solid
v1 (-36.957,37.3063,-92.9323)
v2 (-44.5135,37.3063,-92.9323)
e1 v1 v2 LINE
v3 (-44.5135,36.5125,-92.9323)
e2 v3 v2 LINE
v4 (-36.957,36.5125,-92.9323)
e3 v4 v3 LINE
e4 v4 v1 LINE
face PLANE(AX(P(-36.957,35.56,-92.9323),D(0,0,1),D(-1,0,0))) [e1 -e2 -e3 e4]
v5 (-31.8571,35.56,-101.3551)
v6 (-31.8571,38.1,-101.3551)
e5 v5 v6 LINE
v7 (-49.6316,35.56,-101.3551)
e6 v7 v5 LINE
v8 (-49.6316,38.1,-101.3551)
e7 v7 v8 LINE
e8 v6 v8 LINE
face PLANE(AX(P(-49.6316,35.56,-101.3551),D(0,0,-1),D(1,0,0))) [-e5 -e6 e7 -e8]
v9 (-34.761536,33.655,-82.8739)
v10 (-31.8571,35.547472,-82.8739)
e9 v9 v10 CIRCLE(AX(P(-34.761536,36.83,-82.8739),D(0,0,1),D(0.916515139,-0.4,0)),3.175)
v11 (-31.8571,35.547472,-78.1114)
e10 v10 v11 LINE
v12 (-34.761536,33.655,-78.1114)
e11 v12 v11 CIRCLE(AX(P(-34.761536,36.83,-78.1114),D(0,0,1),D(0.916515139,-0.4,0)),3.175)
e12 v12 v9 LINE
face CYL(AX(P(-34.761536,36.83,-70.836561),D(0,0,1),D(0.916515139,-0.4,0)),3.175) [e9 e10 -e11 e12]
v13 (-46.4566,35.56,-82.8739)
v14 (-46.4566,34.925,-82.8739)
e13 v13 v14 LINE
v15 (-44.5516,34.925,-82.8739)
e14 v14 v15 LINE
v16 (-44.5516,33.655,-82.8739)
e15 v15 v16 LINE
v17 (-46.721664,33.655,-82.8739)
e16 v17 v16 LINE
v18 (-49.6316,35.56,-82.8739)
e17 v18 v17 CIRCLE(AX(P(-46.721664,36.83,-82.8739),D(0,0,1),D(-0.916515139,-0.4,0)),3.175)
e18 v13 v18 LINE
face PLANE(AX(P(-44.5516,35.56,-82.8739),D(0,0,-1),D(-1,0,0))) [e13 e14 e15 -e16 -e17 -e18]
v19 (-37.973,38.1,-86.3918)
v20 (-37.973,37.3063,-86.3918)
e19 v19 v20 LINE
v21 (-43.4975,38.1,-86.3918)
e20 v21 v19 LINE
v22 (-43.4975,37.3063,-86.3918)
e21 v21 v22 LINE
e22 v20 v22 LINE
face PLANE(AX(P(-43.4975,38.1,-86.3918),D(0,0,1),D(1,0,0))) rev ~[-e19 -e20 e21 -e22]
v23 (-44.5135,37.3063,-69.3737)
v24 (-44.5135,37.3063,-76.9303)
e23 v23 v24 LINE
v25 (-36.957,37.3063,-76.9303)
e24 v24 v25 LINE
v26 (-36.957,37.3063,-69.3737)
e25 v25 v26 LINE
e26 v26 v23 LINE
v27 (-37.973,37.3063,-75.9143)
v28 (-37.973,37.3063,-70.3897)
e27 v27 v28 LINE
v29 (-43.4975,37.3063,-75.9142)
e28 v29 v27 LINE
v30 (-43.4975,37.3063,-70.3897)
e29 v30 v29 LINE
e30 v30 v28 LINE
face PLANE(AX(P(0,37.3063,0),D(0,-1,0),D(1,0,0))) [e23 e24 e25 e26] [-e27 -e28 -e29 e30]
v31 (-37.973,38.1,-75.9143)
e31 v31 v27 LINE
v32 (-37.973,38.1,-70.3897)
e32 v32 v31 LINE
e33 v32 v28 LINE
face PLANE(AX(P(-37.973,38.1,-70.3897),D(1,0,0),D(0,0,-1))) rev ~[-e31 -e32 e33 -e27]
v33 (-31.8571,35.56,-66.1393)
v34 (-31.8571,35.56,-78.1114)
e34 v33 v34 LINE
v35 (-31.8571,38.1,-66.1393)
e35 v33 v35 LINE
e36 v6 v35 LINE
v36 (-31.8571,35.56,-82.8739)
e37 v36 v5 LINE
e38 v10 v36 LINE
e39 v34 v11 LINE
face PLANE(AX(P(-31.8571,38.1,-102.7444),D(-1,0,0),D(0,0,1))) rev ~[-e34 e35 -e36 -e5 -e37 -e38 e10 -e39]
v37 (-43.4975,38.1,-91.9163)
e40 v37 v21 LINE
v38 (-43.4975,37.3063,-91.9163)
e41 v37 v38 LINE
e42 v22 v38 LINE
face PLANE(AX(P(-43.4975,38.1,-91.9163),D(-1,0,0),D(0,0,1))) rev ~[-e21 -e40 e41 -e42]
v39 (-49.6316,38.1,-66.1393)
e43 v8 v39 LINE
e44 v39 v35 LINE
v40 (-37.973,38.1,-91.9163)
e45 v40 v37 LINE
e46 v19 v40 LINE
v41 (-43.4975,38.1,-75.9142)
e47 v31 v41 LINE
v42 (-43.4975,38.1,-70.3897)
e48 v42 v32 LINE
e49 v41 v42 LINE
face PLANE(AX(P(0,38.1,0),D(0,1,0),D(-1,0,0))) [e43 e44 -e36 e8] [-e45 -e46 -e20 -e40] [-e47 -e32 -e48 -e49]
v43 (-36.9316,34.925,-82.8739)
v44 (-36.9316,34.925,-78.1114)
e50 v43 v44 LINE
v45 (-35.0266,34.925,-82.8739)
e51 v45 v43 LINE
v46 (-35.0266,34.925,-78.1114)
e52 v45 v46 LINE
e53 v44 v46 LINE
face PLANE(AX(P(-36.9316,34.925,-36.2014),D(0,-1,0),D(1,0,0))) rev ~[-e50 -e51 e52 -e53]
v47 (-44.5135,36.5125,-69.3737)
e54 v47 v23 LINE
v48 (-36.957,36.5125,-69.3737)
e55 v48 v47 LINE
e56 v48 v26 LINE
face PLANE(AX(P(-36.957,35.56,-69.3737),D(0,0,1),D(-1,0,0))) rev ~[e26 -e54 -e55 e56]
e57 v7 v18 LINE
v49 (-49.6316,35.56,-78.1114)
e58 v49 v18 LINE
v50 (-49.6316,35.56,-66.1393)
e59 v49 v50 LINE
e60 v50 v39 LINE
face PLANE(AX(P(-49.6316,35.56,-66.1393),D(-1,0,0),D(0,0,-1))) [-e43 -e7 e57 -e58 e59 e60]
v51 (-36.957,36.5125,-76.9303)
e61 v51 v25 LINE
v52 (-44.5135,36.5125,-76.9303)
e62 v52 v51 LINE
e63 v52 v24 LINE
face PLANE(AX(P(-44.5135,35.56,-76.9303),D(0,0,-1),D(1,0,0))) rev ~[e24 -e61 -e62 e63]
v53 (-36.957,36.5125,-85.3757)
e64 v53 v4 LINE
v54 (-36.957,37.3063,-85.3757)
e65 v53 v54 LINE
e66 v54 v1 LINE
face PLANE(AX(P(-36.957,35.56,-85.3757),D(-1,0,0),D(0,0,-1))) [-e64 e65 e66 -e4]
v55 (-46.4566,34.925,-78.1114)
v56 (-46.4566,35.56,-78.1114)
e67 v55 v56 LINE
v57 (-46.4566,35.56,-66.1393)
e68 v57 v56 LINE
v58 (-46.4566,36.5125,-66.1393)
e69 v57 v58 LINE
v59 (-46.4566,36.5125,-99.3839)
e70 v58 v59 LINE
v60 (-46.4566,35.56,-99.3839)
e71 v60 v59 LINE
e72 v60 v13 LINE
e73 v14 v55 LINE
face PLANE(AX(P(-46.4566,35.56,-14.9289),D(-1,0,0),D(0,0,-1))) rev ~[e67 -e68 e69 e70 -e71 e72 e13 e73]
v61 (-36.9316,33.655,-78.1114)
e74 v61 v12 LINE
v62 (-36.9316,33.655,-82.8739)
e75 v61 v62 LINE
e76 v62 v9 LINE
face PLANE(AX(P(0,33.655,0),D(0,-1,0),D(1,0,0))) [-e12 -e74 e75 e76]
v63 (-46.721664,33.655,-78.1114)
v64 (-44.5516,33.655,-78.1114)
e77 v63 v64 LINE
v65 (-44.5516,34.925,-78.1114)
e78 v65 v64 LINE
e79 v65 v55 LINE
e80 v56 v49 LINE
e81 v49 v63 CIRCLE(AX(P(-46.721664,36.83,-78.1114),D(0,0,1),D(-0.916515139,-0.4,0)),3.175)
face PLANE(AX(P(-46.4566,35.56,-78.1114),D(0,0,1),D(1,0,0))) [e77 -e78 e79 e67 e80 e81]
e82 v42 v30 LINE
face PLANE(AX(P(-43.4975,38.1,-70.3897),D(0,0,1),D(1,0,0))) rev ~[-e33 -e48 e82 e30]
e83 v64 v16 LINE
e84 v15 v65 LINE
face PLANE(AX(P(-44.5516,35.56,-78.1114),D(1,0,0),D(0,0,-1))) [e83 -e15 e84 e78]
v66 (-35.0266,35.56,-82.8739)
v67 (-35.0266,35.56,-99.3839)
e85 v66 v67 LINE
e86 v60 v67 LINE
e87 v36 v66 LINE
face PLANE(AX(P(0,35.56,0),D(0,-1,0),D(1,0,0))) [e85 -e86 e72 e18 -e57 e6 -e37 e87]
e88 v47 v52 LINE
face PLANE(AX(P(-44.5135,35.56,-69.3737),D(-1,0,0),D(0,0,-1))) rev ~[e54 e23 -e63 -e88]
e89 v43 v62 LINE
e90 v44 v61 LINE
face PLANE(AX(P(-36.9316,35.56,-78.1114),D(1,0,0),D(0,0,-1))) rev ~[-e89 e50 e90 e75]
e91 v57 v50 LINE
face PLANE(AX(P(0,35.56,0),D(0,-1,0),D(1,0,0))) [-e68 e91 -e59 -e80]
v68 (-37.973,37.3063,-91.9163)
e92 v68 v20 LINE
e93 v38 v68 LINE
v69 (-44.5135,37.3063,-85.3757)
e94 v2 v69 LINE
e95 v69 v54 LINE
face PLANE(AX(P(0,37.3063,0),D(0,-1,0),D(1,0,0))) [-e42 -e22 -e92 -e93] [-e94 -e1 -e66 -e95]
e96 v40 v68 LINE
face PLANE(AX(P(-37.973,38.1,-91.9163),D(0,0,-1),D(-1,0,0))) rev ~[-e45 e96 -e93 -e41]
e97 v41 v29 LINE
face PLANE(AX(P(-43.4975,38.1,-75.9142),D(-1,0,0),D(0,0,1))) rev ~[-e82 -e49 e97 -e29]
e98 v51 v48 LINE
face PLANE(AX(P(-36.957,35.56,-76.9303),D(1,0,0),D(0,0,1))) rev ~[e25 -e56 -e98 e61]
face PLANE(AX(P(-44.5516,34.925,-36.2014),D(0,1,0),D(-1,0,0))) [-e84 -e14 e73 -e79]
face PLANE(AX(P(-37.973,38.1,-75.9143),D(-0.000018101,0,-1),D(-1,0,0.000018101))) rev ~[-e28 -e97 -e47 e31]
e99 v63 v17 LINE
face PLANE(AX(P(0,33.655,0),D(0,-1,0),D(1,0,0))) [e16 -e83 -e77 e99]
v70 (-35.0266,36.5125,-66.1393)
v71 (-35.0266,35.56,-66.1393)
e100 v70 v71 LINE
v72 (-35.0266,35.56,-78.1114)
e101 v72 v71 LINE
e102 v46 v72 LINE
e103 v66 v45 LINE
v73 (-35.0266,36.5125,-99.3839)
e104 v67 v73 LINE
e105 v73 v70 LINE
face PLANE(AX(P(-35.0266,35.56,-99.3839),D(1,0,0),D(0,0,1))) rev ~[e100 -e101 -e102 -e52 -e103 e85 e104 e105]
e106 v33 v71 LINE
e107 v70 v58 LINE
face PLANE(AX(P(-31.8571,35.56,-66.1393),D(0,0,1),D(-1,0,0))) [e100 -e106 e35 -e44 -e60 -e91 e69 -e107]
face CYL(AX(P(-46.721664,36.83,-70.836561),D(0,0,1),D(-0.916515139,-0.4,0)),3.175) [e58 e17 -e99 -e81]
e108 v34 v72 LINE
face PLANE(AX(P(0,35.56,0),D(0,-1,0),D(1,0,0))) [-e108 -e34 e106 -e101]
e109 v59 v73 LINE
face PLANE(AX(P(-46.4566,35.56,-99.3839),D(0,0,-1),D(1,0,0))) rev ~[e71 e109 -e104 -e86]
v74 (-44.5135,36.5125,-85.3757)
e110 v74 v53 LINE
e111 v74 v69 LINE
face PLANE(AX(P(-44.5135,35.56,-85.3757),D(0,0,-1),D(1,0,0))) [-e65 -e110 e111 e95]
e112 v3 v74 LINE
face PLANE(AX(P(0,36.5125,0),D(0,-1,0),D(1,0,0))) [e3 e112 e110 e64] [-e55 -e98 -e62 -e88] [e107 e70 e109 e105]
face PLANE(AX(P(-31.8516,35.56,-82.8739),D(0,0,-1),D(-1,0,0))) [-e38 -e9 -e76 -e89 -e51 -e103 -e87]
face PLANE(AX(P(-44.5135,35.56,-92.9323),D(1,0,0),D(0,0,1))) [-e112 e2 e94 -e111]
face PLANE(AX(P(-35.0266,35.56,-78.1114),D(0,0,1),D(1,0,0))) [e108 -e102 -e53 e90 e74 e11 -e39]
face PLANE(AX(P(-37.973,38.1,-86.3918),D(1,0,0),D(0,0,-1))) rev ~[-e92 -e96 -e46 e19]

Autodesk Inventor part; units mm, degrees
ref_plane "YZ Plane" through (0, 0, 0) normal (1, 0, 0) x (0, 1, 0)
ref_plane "XZ Plane" through (0, 0, 0) normal (0, 1, 0) x (-1, 0, 0)
ref_plane "XY Plane" through (0, 0, 0) normal (0, 0, 1) x (1, 0, 0)
sketch "Sketch1" plane through (0, 0, 0) normal (0, 1, 0) x (-1, 0, 0)
  line L0 (0, 0) -> (177.8, 0)
  line L1 (177.8, 0) -> (177.8, -114.3)
  line L2 (177.8, -114.3) -> (0, -114.3)
  line L3 (0, -114.3) -> (0, 0)
  dimension "d0" = 177.8
  dimension "d1" = 114.3
extrude "Extrusion1" add sketch "Sketch1" along normal blind 38.1
sketch "Sketch2" plane through (0, 0, 0) normal (0, -1, 0) x (1, 0, 0)
  line L0 (-177.8, -114.3) -> (-177.8, 0) projected
  line L1 (0, 0) -> (-177.8, 0)
  line L2 (-177.8, 0) -> (-177.8, -114.3)
  line L3 (-177.8, -114.3) -> (0, -114.3)
  line L4 (0, -114.3) -> (0, 0)
  line L5 (-5.08, -5.08) -> (-172.72, -5.08)
  line L6 (-172.72, -5.08) -> (-172.72, -109.22)
  line L7 (-172.72, -109.22) -> (-5.08, -109.22)
  line L8 (-5.08, -109.22) -> (-5.08, -5.08)
  dimension "d4" = 5.08
extrude "Extrusion2" cut sketch "Sketch2" against normal blind 35.56 contours L8 L7 L6 L5
fillet "Fillet1" radius 3.175 4 edges at (-177.8, 38.1, -57.15) (-88.9, 38.1, 0) (-88.9, 38.1, -114.3) (0, 38.1, -57.15)
sketch "Sketch3" plane through (0, 38.1, 0) normal (0, 1, 0) x (1, 0, 0)
  line L0 (-177.8, 114.3) -> (-171.45, 114.3)
  line L1 (-171.45, 114.3) -> (-171.45, 0)
  line L2 (-171.45, 0) -> (-177.8, 0)
  line L3 (-177.8, 0) -> (-177.8, 114.3)
  line L4 (0, 114.3) -> (-177.8, 114.3) projected
  line L5 (-177.8, 114.3) -> (0, 114.3)
  line L6 (0, 114.3) -> (0, 107.95)
  line L7 (0, 107.95) -> (-177.8, 107.95)
  line L8 (-177.8, 107.95) -> (-177.8, 114.3)
  line L9 (-158.75, 100.4887) -> (-100.6475, 100.4887)
  line L10 (-100.6475, 100.4887) -> (-100.6475, 13.8112)
  line L11 (-100.6475, 13.8112) -> (-158.75, 13.8112)
  line L12 (-158.75, 13.8112) -> (-158.75, 100.4887)
  point P0 (0, 0)
  dimension "d8" = 6.35
  dimension "d9" = 6.35
  dimension "d10" = 58.1025
  dimension "d11" = 86.6775
  dimension "d12" = 13.8112
  dimension "d13" = 19.05
extrude "Extrusion3" cut sketch "Sketch3" against normal blind 35.56 contours L9 L10 L11 L12
sketch "Sketch4" plane through (0, 38.1, 0) normal (0, 1, 0) x (1, 0, 0)
  line L0 (-94.2975, 17.78) -> (-81.2088, 17.78)
  line L1 (-91.7575, 20.32) -> (-91.7575, 26.67)
  line L2 (-91.7575, 26.67) -> (-94.2975, 26.67)
  line L3 (-94.2975, 26.67) -> (-94.2975, 17.78)
  line L4 (-94.2975, 17.78) -> (-78.6765, 17.78)
  line L5 (-78.6765, 17.78) -> (-78.6765, 20.32)
  line L6 (-94.2975, 24.2647) -> (-94.2975, 17.78)
  line L7 (-85.6615, 20.32) -> (-85.6615, 24.13)
  line L8 (-85.6615, 24.13) -> (-88.2015, 24.13)
  line L9 (-88.2015, 24.13) -> (-88.2015, 20.32)
  line L10 (-78.6765, 20.32) -> (-85.6615, 20.32)
  line L11 (-88.2015, 20.32) -> (-91.7575, 20.32)
  line L12 (-100.6475, 100.4887) -> (-100.6475, 13.8112) projected
  line L13 (-177.8, 0) -> (0, 0) projected
  line L14 (-94.2975, 27.94) -> (-78.6765, 27.94)
  line L15 (-78.6765, 27.94) -> (-78.6765, 30.7699)
  line L16 (-81.2165, 30.48) -> (-94.2975, 30.48)
  line L17 (-94.2975, 30.48) -> (-94.2975, 27.94)
  line L18 (-83.0828, 27.94) -> (-78.6765, 27.94)
  line L19 (-78.6765, 27.94) -> (-78.6765, 36.83)
  line L20 (-78.6765, 36.83) -> (-81.2165, 36.83)
  line L21 (-81.2165, 36.83) -> (-81.2165, 30.48)
  ellipse E0 centre (-86.487, 41.91) end of major axis (-94.2975, 41.91) minor radius 5.334
  ellipse E1 centre (-86.487, 53.34) end of major axis (-94.2975, 53.34) minor radius 5.334
  line L22 (-94.2975, 60.96) -> (-78.6765, 60.96)
  line L23 (-78.6765, 60.96) -> (-78.6765, 63.754)
  line L24 (-94.2975, 63.754) -> (-94.2975, 60.96)
  ellipse E2 centre (-86.487, 63.754) end of major axis (-94.2975, 63.754) minor radius 7.62 (-78.6765, 63.754) -> (-94.2975, 63.754) ccw
  line L25 (-91.7575, 63.754) -> (-91.7575, 63.5)
  line L26 (-91.7575, 63.5) -> (-81.2165, 63.5)
  line L27 (-81.2165, 63.5) -> (-81.2165, 63.754)
  line L28 (-94.2975, 82.55) -> (-78.6765, 82.55)
  line L29 (-78.6765, 82.55) -> (-78.6765, 80.01)
  line L30 (-78.6765, 80.01) -> (-94.2975, 80.01)
  line L31 (-94.2975, 80.01) -> (-94.2975, 82.55)
  line L32 (-91.7575, 89.535) -> (-78.6765, 89.535)
  line L33 (-78.6765, 89.535) -> (-78.6765, 92.075)
  line L34 (-78.6765, 92.075) -> (-91.7575, 92.075)
  line L35 (-94.2975, 94.8241) -> (-94.2975, 91.9305)
  line L36 (-94.2975, 85.09) -> (-91.7575, 85.09)
  line L37 (-91.7575, 96.52) -> (-94.2975, 96.52)
  line L38 (-94.2975, 96.52) -> (-94.2975, 85.09)
  line L39 (-91.7575, 85.09) -> (-91.7575, 89.535)
  line L40 (-91.7575, 92.075) -> (-91.7575, 96.52)
  spline S0 degree 5 poles (-91.7575, 41.91) (-91.7584, 41.6813) (-91.6944, 41.4527) (-91.5885, 41.2473) (-91.2042, 40.6846) (-90.6636, 40.2564) (-90.282, 40.0177) (-89.3306, 39.5478) (-88.3046, 39.2718) (-87.7026, 39.1679) (-86.487, 39.0641) (-85.2714, 39.1679) (-84.6694, 39.2718) (-83.6435, 39.5478) (-82.692, 40.0176) (-82.3107, 40.2563) (-81.7696, 40.6845) (-81.3858, 41.2473) (-81.2787, 41.4526) (-81.1539, 41.91) (-81.2787, 42.3674) (-81.3858, 42.5727) (-81.7696, 43.1355) (-82.3107, 43.5637) (-82.692, 43.8024) (-83.6435, 44.2722) (-84.6694, 44.5482) (-85.2714, 44.6521) (-86.487, 44.7559) (-87.7026, 44.6521) (-88.3046, 44.5482) (-89.3306, 44.2722) (-90.282, 43.8023) (-90.6636, 43.5636) (-91.2042, 43.1354) (-91.5885, 42.5727) (-91.6944, 42.3673) (-91.7584, 42.1387) (-91.7575, 41.91) knots 0 0 0 0 0 0 0.044471 0.044471 0.044471 0.131758 0.131758 0.131758 0.25 0.25 0.25 0.36824 0.36824 0.36824 0.455522 0.455522 0.455522 0.5 0.5 0.5 0.544478 0.544478 0.544478 0.63176 0.63176 0.63176 0.75 0.75 0.75 0.868242 0.868242 0.868242 0.955529 0.955529 0.955529 1 1 1 1 1 1
  spline S1 degree 5 poles (-91.7575, 53.34) (-91.7584, 53.1113) (-91.6944, 52.8827) (-91.5885, 52.6773) (-91.2042, 52.1146) (-90.6636, 51.6864) (-90.282, 51.4477) (-89.3306, 50.9778) (-88.3046, 50.7018) (-87.7026, 50.5979) (-86.487, 50.4941) (-85.2714, 50.5979) (-84.6694, 50.7018) (-83.6435, 50.9778) (-82.692, 51.4476) (-82.3107, 51.6863) (-81.7696, 52.1145) (-81.3858, 52.6773) (-81.2787, 52.8826) (-81.1539, 53.34) (-81.2787, 53.7974) (-81.3858, 54.0027) (-81.7696, 54.5655) (-82.3107, 54.9937) (-82.692, 55.2324) (-83.6435, 55.7022) (-84.6694, 55.9782) (-85.2714, 56.0821) (-86.487, 56.1859) (-87.7026, 56.0821) (-88.3046, 55.9782) (-89.3306, 55.7022) (-90.282, 55.2323) (-90.6636, 54.9936) (-91.2042, 54.5654) (-91.5885, 54.0027) (-91.6944, 53.7973) (-91.7584, 53.5687) (-91.7575, 53.34) knots 0 0 0 0 0 0 0.044471 0.044471 0.044471 0.131758 0.131758 0.131758 0.25 0.25 0.25 0.36824 0.36824 0.36824 0.455522 0.455522 0.455522 0.5 0.5 0.5 0.544478 0.544478 0.544478 0.63176 0.63176 0.63176 0.75 0.75 0.75 0.868242 0.868242 0.868242 0.955529 0.955529 0.955529 1 1 1 1 1 1
  spline S2 degree 5 poles (-81.2165, 63.754) (-81.2166, 64.309) (-81.2953, 64.8639) (-81.4525, 65.404) (-82.1282, 66.8995) (-83.3585, 68.0474) (-84.3453, 68.5716) (-86.487, 69.0964) (-88.6287, 68.5716) (-89.6155, 68.0474) (-90.8458, 66.8995) (-91.5215, 65.404) (-91.6787, 64.8639) (-91.7574, 64.309) (-91.7575, 63.754) knots 0 0 0 0 0 0 0.170659 0.170659 0.170659 0.5 0.5 0.5 0.829341 0.829341 0.829341 1 1 1 1 1 1
  point P0 (-94.2975, 93.3773)
  point P1 (-88.9, 0)
  point P2 (-93.0275, 85.09)
  dimension "d32" = 5.334
  dimension "d33" = 7.8105
  dimension "d36" = 7.8105
  dimension "d37" = 5.334
  dimension "d42" = 7.62
  dimension "d43" = 2.54
  dimension "d16" = 2.54
  dimension "d17" = 3.556
  dimension "d18" = 2.54
  dimension "d19" = 6.985
  dimension "d20" = 8.89
  dimension "d21" = 6.35
  dimension "d22" = 3.81
  dimension "d23" = 3.81
  dimension "d24" = 6.35
  dimension "d25" = 17.78
  dimension "d26" = 2.54
  dimension "d27" = 2.54
  dimension "d28" = 6.35
  dimension "d29" = 15.621
  dimension "d30" = 6.35
  dimension "d31" = 27.94
  dimension "d34" = 14.1605
  dimension "d35" = 41.91
  dimension "d38" = 14.1605
  dimension "d39" = 53.34
  dimension "d40" = 2.54
  dimension "d41" = 2.54
  dimension "d44" = 6.35
  dimension "d45" = 15.621
  dimension "d46" = 60.96
  dimension "d47" = 2.794
  dimension "d48" = 63.754
  dimension "d49" = 14.1605
  dimension "d50" = 2.54
  dimension "d51" = 15.621
  dimension "d52" = 4.445
  dimension "d53" = 4.445
  dimension "d54" = 2.54
  dimension "d55" = 2.54
  dimension "d56" = 6.35
  dimension "d57" = 80.01
  dimension "d58" = 2.54
  dimension "d59" = 13.081
  dimension "d62" = 3.9688
  dimension "d63" = 3.9688
extrude "Extrusion4" cut sketch "Sketch4" against normal blind 1.27
sketch "Sketch5" plane through (0, 38.1, 0) normal (0, 1, 0) x (1, 0, 0)
  line L0 (-43.4975, 22.3838) -> (-37.973, 22.3838)
  line L1 (-37.973, 22.3838) -> (-37.973, 27.9083)
  line L2 (-37.973, 27.9083) -> (-43.4975, 27.9083)
  line L3 (-43.4975, 27.9083) -> (-43.4975, 22.3838)
  line L4 (-43.4975, 38.3858) -> (-37.973, 38.3858)
  line L5 (-37.973, 38.3858) -> (-37.973, 43.9103)
  line L6 (-37.973, 43.9103) -> (-43.4975, 43.9103)
  line L7 (-43.4975, 43.9103) -> (-43.4975, 38.3858)
  line L8 (-43.4975, 54.3878) -> (-37.973, 54.3878)
  line L9 (-37.973, 54.3878) -> (-37.973, 59.9123)
  line L10 (-37.973, 59.9123) -> (-43.4975, 59.9123)
  line L11 (-43.4975, 59.9123) -> (-43.4975, 54.3878)
  line L12 (-43.4975, 70.3897) -> (-37.973, 70.3897)
  line L13 (-37.973, 70.3897) -> (-37.973, 75.9143)
  line L14 (-37.973, 75.9143) -> (-43.4975, 75.9142)
  line L15 (-43.4975, 75.9142) -> (-43.4975, 70.3897)
  line L16 (-43.4975, 86.3918) -> (-37.973, 86.3918)
  line L17 (-37.973, 86.3918) -> (-37.973, 91.9163)
  line L18 (-37.973, 91.9163) -> (-43.4975, 91.9163)
  line L19 (-43.4975, 91.9163) -> (-43.4975, 86.3918)
  line L20 (0, 114.3) -> (-177.8, 114.3) projected
  line L21 (-177.8, 0) -> (0, 0) projected
  line L22 (-100.6475, 100.4887) -> (-100.6475, 13.8112) projected
  circle A0 centre (-21.9075, 25.4) radius 3.81
  circle A1 centre (-21.9075, 41.275) radius 3.81
  circle A2 centre (-21.9075, 57.15) radius 3.81
  circle A3 centre (-21.9075, 73.025) radius 3.81
  circle A4 centre (-21.9075, 88.9) radius 3.81
  point P0 (-43.4975, 73.152)
  dimension "d64" = 5.5245
  dimension "d65" = 5.5245
  dimension "d66" = 5.5245
  dimension "d67" = 5.5245
  dimension "d68" = 5.5245
  dimension "d69" = 5.5245
  dimension "d70" = 16.002
  dimension "d71" = 16.002
  dimension "d72" = 16.002
  dimension "d73" = 16.002
  dimension "d74" = 22.3837
  dimension "d76" = 57.15
  dimension "d77" = 7.62
  dimension "d78" = 7.62
  dimension "d79" = 7.62
  dimension "d80" = 7.62
  dimension "d81" = 7.62
  dimension "d82" = 15.875
  dimension "d83" = 15.875
  dimension "d84" = 15.875
  dimension "d85" = 15.875
  dimension "d86" = 25.4
  dimension "d87" = 78.74
  dimension "d88" = 78.74
  dimension "d89" = 78.74
  dimension "d90" = 78.74
  dimension "d91" = 78.74
extrude "Extrusion5" cut sketch "Sketch5" against normal blind 25.4
sketch "Sketch6" plane through (0, 35.56, 0) normal (0, -1, 0) x (1, 0, 0)
  circle A0 centre (-21.9075, -88.9) radius 3.81 projected
  circle A1 centre (-21.9075, -88.9) radius 5.08
  circle A2 centre (-21.9075, -73.025) radius 3.81 projected
  circle A3 centre (-21.9075, -73.025) radius 5.08
  circle A4 centre (-21.9075, -57.15) radius 3.81 projected
  circle A5 centre (-21.9075, -57.15) radius 5.08
  circle A6 centre (-21.9075, -41.275) radius 3.81 projected
  circle A7 centre (-21.9075, -41.275) radius 5.08
  circle A8 centre (-21.9075, -25.4) radius 3.81 projected
  circle A9 centre (-21.9075, -25.4) radius 5.08
  line L0 (-43.4975, -86.3918) -> (-43.4975, -91.9163) projected
  line L1 (-43.4975, -91.9163) -> (-37.973, -91.9163)
  line L2 (-37.973, -91.9163) -> (-37.973, -86.3918)
  line L3 (-37.973, -86.3918) -> (-43.4975, -86.3918)
  line L4 (-43.4975, -86.3918) -> (-43.4975, -91.9163)
  line L5 (-43.4975, -75.9142) -> (-37.973, -75.9143) projected
  line L6 (-43.4975, -70.3897) -> (-37.973, -70.3897) projected
  line L7 (-43.4975, -75.9142) -> (-37.973, -75.9142)
  line L8 (-37.973, -75.9142) -> (-37.973, -70.3897)
  line L9 (-37.973, -70.3897) -> (-43.4975, -70.3897)
  line L10 (-43.4975, -70.3897) -> (-43.4975, -75.9142)
  line L11 (-43.4975, -54.3878) -> (-43.4975, -59.9123) projected
  line L12 (-43.4975, -54.3878) -> (-37.973, -54.3878) projected
  line L13 (-43.4975, -59.9123) -> (-37.973, -59.9123)
  line L14 (-37.973, -59.9123) -> (-37.973, -54.3878)
  line L15 (-37.973, -54.3878) -> (-43.4975, -54.3878)
  line L16 (-43.4975, -54.3878) -> (-43.4975, -59.9123)
  line L17 (-43.4975, -38.3858) -> (-43.4975, -43.9103) projected
  line L18 (-37.973, -38.3858) -> (-43.4975, -38.3858) projected
  line L19 (-43.4975, -43.9103) -> (-37.973, -43.9103)
  line L20 (-37.973, -43.9103) -> (-37.973, -38.3858)
  line L21 (-37.973, -38.3858) -> (-43.4975, -38.3858)
  line L22 (-43.4975, -38.3858) -> (-43.4975, -43.9103)
  line L23 (-43.4975, -22.3838) -> (-43.4975, -27.9083) projected
  line L24 (-43.4975, -27.9083) -> (-37.973, -27.9083)
  line L25 (-37.973, -27.9083) -> (-37.973, -22.3838)
  line L26 (-37.973, -22.3838) -> (-43.4975, -22.3838)
  line L27 (-43.4975, -22.3838) -> (-43.4975, -27.9083)
  line L28 (-44.5135, -85.3757) -> (-36.957, -85.3757)
  line L29 (-36.957, -85.3757) -> (-36.957, -92.9323)
  line L30 (-36.957, -92.9323) -> (-44.5135, -92.9323)
  line L31 (-44.5135, -92.9323) -> (-44.5135, -85.3757)
  line L32 (-44.5135, -76.9303) -> (-36.957, -76.9303)
  line L33 (-36.957, -76.9303) -> (-36.957, -69.3737)
  line L34 (-36.957, -69.3737) -> (-44.5135, -69.3737)
  line L35 (-44.5135, -69.3737) -> (-44.5135, -76.9303)
  line L36 (-36.957, -60.9282) -> (-44.5135, -60.9282)
  line L37 (-44.5135, -60.9282) -> (-44.5135, -53.3717)
  line L38 (-44.5135, -53.3717) -> (-36.957, -53.3717)
  line L39 (-36.957, -53.3717) -> (-36.957, -60.9282)
  line L40 (-36.957, -44.9262) -> (-44.5135, -44.9262)
  line L41 (-44.5135, -44.9262) -> (-44.5135, -37.3698)
  line L42 (-44.5135, -37.3698) -> (-36.957, -37.3698)
  line L43 (-36.957, -37.3698) -> (-36.957, -44.9262)
  line L44 (-36.957, -28.9242) -> (-44.5135, -28.9242)
  line L45 (-44.5135, -28.9242) -> (-44.5135, -21.3678)
  line L46 (-44.5135, -21.3678) -> (-36.957, -21.3678)
  line L47 (-36.957, -21.3678) -> (-36.957, -28.9242)
  line L48 (-46.4566, -99.3839) -> (-35.0266, -99.3839)
  line L49 (-35.0266, -99.3839) -> (-35.0266, -14.9289)
  line L50 (-35.0266, -14.9289) -> (-46.4566, -14.9289)
  line L51 (-46.4566, -14.9289) -> (-46.4566, -99.3839)
  point P0 (0, 0)
  point P1 (-40.7352, -92.9323)
  point P2 (-40.7416, -99.3839)
  point P3 (-40.7416, -14.9289)
  point P4 (-40.7352, -21.3678)
  dimension "d97" = 10.16
  dimension "d98" = 10.16
  dimension "d99" = 10.16
  dimension "d100" = 10.16
  dimension "d101" = 10.16
  dimension "d189" = 1.016
  dimension "d190" = 1.016
  dimension "d191" = 1.016
  dimension "d192" = 1.016
  dimension "d193" = 1.016
  dimension "d194" = 11.43
  dimension "d195" = 1.9431
  dimension "d196" = 1.9304
  dimension "d197" = 84.455
  dimension "d198" = 6.4516
  dimension "d199" = 6.4389
extrude "Extrusion6" cut sketch "Sketch6" against normal blind 1.27 contours A1 | A3 | A5 | A7 | A9
extrude "Extrusion9" cut sketch "Sketch6" against normal blind 1.7463 contours L28 L29 L30 L31 | L35 L34 L33 L32 | L36 L37 L38 L39 | L40 L41 L42 L43 | L44 L45 L46 L47
sketch "Sketch8" plane through (0, 35.56, 0) normal (0, -1, 0) x (1, 0, 0)
  line L0 (-100.6475, -13.8112) -> (-100.6475, -100.4887) projected
  line L1 (-100.6475, -13.8112) -> (-158.75, -13.8112)
  line L2 (-158.75, -13.8112) -> (-158.75, -7.4613)
  line L3 (-158.75, -7.4613) -> (-100.6475, -7.4612)
  line L4 (-100.6475, -7.4612) -> (-100.6475, -13.8112)
  line L5 (-158.75, -100.4887) -> (-100.6475, -100.4887) projected
  line L6 (-100.6475, -100.4887) -> (-158.75, -100.4887)
  line L7 (-158.75, -100.4887) -> (-158.75, -107.4737)
  line L8 (-158.75, -107.4737) -> (-100.6475, -107.4737)
  line L9 (-100.6475, -107.4737) -> (-100.6475, -100.4887)
  line L10 (-100.6475, -7.4612) -> (-94.2975, -7.4612)
  line L11 (-94.2975, -7.4612) -> (-94.2975, -13.8112)
  line L12 (-94.2975, -13.8112) -> (-100.6475, -13.8112)
  line L13 (-100.6475, -13.8112) -> (-100.6475, -7.4612)
  line L14 (-100.6475, -100.4887) -> (-94.2975, -100.4887)
  line L15 (-94.2975, -100.4887) -> (-94.2975, -107.4737)
  line L16 (-94.2975, -107.4737) -> (-100.6475, -107.4737)
  line L17 (-100.6475, -107.4737) -> (-100.6475, -100.4887)
  line L18 (-158.75, -100.4887) -> (-165.1, -100.4887)
  line L19 (-165.1, -100.4887) -> (-165.1, -107.4737)
  line L20 (-165.1, -107.4737) -> (-158.75, -107.4737)
  line L21 (-158.75, -107.4737) -> (-158.75, -100.4887)
  line L22 (-158.75, -7.4613) -> (-165.1, -7.4613)
  line L23 (-165.1, -7.4613) -> (-165.1, -13.8112)
  line L24 (-165.1, -13.8112) -> (-158.75, -13.8112)
  line L25 (-158.75, -13.8112) -> (-158.75, -7.4613)
  line L26 (-102.4053, -9.0487) -> (-155.7453, -9.0487)
  line L27 (-155.7453, -9.0487) -> (-155.7453, -12.2237)
  line L28 (-155.7453, -12.2237) -> (-102.4053, -12.2237)
  line L29 (-102.4053, -12.2237) -> (-102.4053, -9.0487)
  point P0 (0, 0)
  dimension "d126" = 6.35
  dimension "d127" = 6.985
  dimension "d128" = 6.35
  dimension "d129" = 6.35
  dimension "d130" = 6.35
  dimension "d131" = 53.34
  dimension "d132" = 3.175
  dimension "d133" = 1.5875
extrude "Extrusion10" cut sketch "Sketch8" against normal blind 1.27 contours L29 L28 L27 L26
extrude "Extrusion11" cut sketch "Sketch6" against normal blind 0.9525 contours L51 L50 L49 L48
sketch "Sketch9" plane through (-177.8, 0, 0) normal (0, 0, 1) x (1, 0, 0)
  line L0 (77.1525, 35.56) -> (19.05, 35.56) projected
  line L1 (172.72, 0) -> (5.08, 0) projected
  line L2 (77.1525, 35.56) -> (127.9525, 35.56)
  line L3 (127.9525, 35.56) -> (127.9525, 0)
  line L4 (127.9525, 0) -> (77.1525, 0)
  line L5 (77.1525, 0) -> (77.1525, 35.56)
  line L6 (86.868, 17.145) -> (106.68, 17.145)
  line L7 (106.68, 17.145) -> (106.68, 15.3035)
  line L8 (106.68, 15.3035) -> (86.868, 15.3035)
  line L9 (86.868, 15.3035) -> (86.868, 17.145)
  line L10 (89.408, 15.3035) -> (97.028, 15.3035)
  line L11 (97.028, 15.3035) -> (97.028, 11.7475)
  line L12 (97.028, 11.7475) -> (89.408, 11.7475)
  line L13 (89.408, 11.7475) -> (89.408, 15.3035)
  line L14 (0, 34.925) -> (177.8, 34.925) projected
  line L15 (0, 0) -> (0, 34.925) projected
  line L16 (177.8, 0) -> (177.8, 34.925) projected
  point P0 (97.028, 15.3035)
  dimension "d144" = 50.8
  dimension "d145" = 19.812
  dimension "d146" = 1.8415
  dimension "d147" = 7.62
  dimension "d148" = 3.556
  dimension "d149" = 2.54
  dimension "d150" = 17.78
  dimension "d187" = 71.12
extrude "Extrusion12" cut sketch "Sketch9" against normal blind 5.08 contours L6 L7 L8 L9 | L8 L11 L12 L13
sketch "Sketch10" plane through (-5.08, 0, -5.08) normal (0, 0, -1) x (-1, 0, 0)
  line L0 (83.312, 11.7475) -> (75.692, 11.7475) projected
  line L1 (83.312, 15.3035) -> (85.852, 15.3035) projected
  line L2 (75.692, 11.7475) -> (83.312, 11.7475)
  line L3 (83.312, 11.7475) -> (83.312, 15.3035)
  line L4 (75.692, 15.3035) -> (75.692, 11.7475)
  line L5 (75.692, 15.3035) -> (66.04, 15.3035) projected
  line L6 (85.852, 17.145) -> (85.852, 15.3035) projected
  line L7 (85.852, 15.3035) -> (85.852, 17.145)
  line L8 (85.852, 17.145) -> (66.04, 17.145)
  line L9 (66.04, 17.145) -> (66.04, 15.3035)
  line L10 (66.04, 15.3035) -> (75.692, 15.3035)
  line L11 (83.312, 15.3035) -> (85.852, 15.3035)
  line L12 (73.787, 9.8425) -> (85.217, 9.8425)
  line L13 (85.217, 9.8425) -> (85.217, 13.3985)
  line L14 (85.217, 13.3985) -> (87.757, 13.3985)
  line L15 (87.757, 13.3985) -> (87.757, 19.05)
  line L16 (87.757, 19.05) -> (64.135, 19.05)
  line L17 (64.135, 19.05) -> (64.135, 13.3985)
  line L18 (64.135, 13.3985) -> (73.787, 13.3985)
  line L19 (73.787, 13.3985) -> (73.787, 9.8425)
  line L20 (73.787, 13.3985) -> (73.787, 15.3035)
  line L21 (85.217, 13.3985) -> (85.217, 15.3035)
  point P0 (-5.08, 0)
  dimension "d153" = 1.905
extrude "Extrusion13" cut sketch "Sketch10" against normal blind 3.175 contours L3 L1 L21 L13 L12 L19 L20 L5 L4 L0 | L1 L6 L8 L9 L5 L20 L18 L17 L16 L15 L14 L21
sketch "Sketch11" plane through (0, 0, -114.3) normal (0, 0, -1) x (-1, 0, 0)
  line L0 (63.5, 23.495) -> (75.946, 23.495)
  line L1 (75.946, 23.495) -> (75.946, 16.383)
  line L2 (75.946, 16.383) -> (63.5, 16.383)
  line L3 (63.5, 16.383) -> (63.5, 23.495)
  line L4 (0, 0) -> (0, 34.925) projected
  circle A0 centre (69.723, 19.939) radius 3.556
  line L5 (0, 34.925) -> (177.8, 34.925) projected
  dimension "d156" = 7.112
  dimension "d157" = 63.5
  dimension "d158" = 12.446
  dimension "d164" = 11.43
  dimension "d219" = 7.112
  dimension "d220" = 3.556
  dimension "d221" = 6.223
extrude "Extrusion14" cut sketch "Sketch11" against normal blind 6.35 contours A0
sketch "Sketch12" plane through (-172.72, 0, -109.22) normal (0, 0, 1) x (1, 0, 0)
  line L0 (97.282, 16.383) -> (108.712, 16.383)
  line L1 (108.712, 16.383) -> (108.712, 23.495)
  line L2 (108.712, 23.495) -> (97.282, 23.495)
  line L3 (97.282, 23.495) -> (97.282, 16.383)
  circle A0 centre (102.997, 19.939) radius 3.556 projected
  line L4 (97.282, 16.383) -> (108.712, 23.495) construction
  line L5 (108.712, 16.383) -> (97.282, 23.495) construction
  point P0 (172.72, 0)
  point P1 (102.997, 16.383)
  point P2 (102.997, 23.495)
  dimension "d161" = 11.43
  dimension "d222" = 7.112
extrude "Extrusion15" cut sketch "Sketch12" against normal blind 2.0574 contours L3 L2 A0 L0 | A0 L2 L1 L0
sketch "Sketch13" plane through (0, 35.56, 0) normal (0, -1, 0) x (1, 0, 0)
  line L0 (-35.0266, -14.9289) -> (-35.0266, -99.3839) projected
  line L1 (-46.4566, -99.3839) -> (-46.4566, -14.9289) projected
  line L2 (-46.4566, -31.4389) -> (-44.5516, -31.4389)
  line L3 (-44.5516, -31.4389) -> (-44.5516, -36.2014)
  line L4 (-44.5516, -36.2014) -> (-46.4566, -36.2014)
  line L5 (-46.4566, -36.2014) -> (-46.4566, -31.4389)
  line L6 (-46.4566, -31.4389) -> (-49.6316, -31.4389)
  line L7 (-49.6316, -31.4389) -> (-49.6316, -36.2014)
  line L8 (-49.6316, -36.2014) -> (-46.4566, -36.2014)
  line L9 (-46.4566, -36.2014) -> (-46.4566, -31.4389)
  line L10 (-35.0266, -31.4389) -> (-36.9316, -31.4389)
  line L11 (-36.9316, -31.4389) -> (-36.9316, -36.2014)
  line L12 (-36.9316, -36.2014) -> (-35.0266, -36.2014)
  line L13 (-35.0266, -36.2014) -> (-35.0266, -31.4389)
  line L14 (-35.0266, -31.4389) -> (-31.8516, -31.4389)
  line L15 (-31.8516, -31.4389) -> (-31.8516, -36.2014)
  line L16 (-31.8516, -36.2014) -> (-35.0266, -36.2014)
  line L17 (-35.0266, -36.2014) -> (-35.0266, -31.4389)
  line L18 (-35.0266, -78.1114) -> (-31.8516, -78.1114)
  line L19 (-31.8516, -78.1114) -> (-31.8516, -82.8739)
  line L20 (-31.8516, -82.8739) -> (-35.0266, -82.8739)
  line L21 (-35.0266, -82.8739) -> (-35.0266, -78.1114)
  line L22 (-35.0266, -78.1114) -> (-36.9316, -78.1114)
  line L23 (-36.9316, -78.1114) -> (-36.9316, -82.8739)
  line L24 (-36.9316, -82.8739) -> (-35.0266, -82.8739)
  line L25 (-35.0266, -82.8739) -> (-35.0266, -78.1114)
  line L26 (-46.4566, -78.1114) -> (-44.5516, -78.1114)
  line L27 (-44.5516, -78.1114) -> (-44.5516, -82.8739)
  line L28 (-44.5516, -82.8739) -> (-46.4566, -82.8739)
  line L29 (-46.4566, -82.8739) -> (-46.4566, -78.1114)
  line L30 (-46.4566, -78.1114) -> (-49.6316, -78.1114)
  line L31 (-49.6316, -78.1114) -> (-49.6316, -82.8739)
  line L32 (-49.6316, -82.8739) -> (-46.4566, -82.8739)
  line L33 (-46.4566, -82.8739) -> (-46.4566, -78.1114)
  line L34 (-46.4566, -14.9289) -> (-35.0266, -14.9289) projected
  line L35 (-35.0266, -99.3839) -> (-46.4566, -99.3839) projected
  point P0 (0, 0)
  dimension "d202" = 1.905
  dimension "d203" = 3.175
  dimension "d204" = 1.905
  dimension "d205" = 3.175
  dimension "d206" = 4.7625
  dimension "d207" = 4.7625
  dimension "d208" = 4.7625
  dimension "d209" = 16.51
  dimension "d210" = 16.51
  dimension "d211" = 16.51
  dimension "d212" = 3.175
  dimension "d213" = 1.905
extrude "Extrusion16" add sketch "Sketch13" along normal blind 1.905 contours L14 L15 L16 L0 | L0 L12 L11 L10 | L2 L3 L4 L1 | L1 L8 L7 L6 | L18 L19 L20 L0 | L0 L24 L23 L22 | L26 L27 L28 L1 | L1 L32 L31 L30
fillet "Fillet2" radius 3.175 4 edges at (-49.6316, 33.655, -33.8201) (-31.8516, 33.655, -33.8201) (-31.8516, 33.655, -80.4926) (-49.6316, 33.655, -80.4926)
sketch "Sketch15" plane through (-44.5516, 35.56, -36.2014) normal (0, 0, -1) x (-1, 0, 0)
  line L0 (1.905, 0) -> (0, 0) projected
  line L1 (0, 0) -> (0, -1.905) projected
  line L2 (1.905, 0) -> (0, 0)
  line L3 (0, 0) -> (0, -0.635)
  line L4 (0, -0.635) -> (1.905, -0.635)
  line L5 (1.905, -0.635) -> (1.905, 0)
  line L6 (-7.62, 0) -> (-9.525, 0) projected
  line L7 (-7.62, 0) -> (-7.62, -1.905) projected
  line L8 (-9.525, 0) -> (-7.62, 0)
  line L9 (-7.62, 0) -> (-7.62, -0.635)
  line L10 (-7.62, -0.635) -> (-9.525, -0.635)
  line L11 (-9.525, -0.635) -> (-9.525, 0)
  point P0 (-44.5516, -35.56)
  dimension "d214" = 0.635
extrude "Extrusion18" cut sketch "Sketch15" along normal blind 50.8 and the other way blind 12.7
sketch "Sketch16" plane through (0, 38.1, 0) normal (0, 1, 0) x (1, 0, 0)
  line L0 (-50.7657, 102.7444) -> (-31.8571, 102.7444)
  line L1 (-31.8571, 102.7444) -> (-31.8571, 65.2503)
  line L2 (-31.8571, 65.2503) -> (-50.7657, 65.2503)
  line L3 (-50.7657, 65.2503) -> (-50.7657, 102.7444)
  line L4 (-228.7011, 132.6427) -> (23.0912, 132.6427)
  line L5 (23.0912, 132.6427) -> (23.0912, -13.2934)
  line L6 (23.0912, -13.2934) -> (-228.7011, -13.2934)
  line L7 (-228.7011, -13.2934) -> (-228.7011, 132.6427)
  point P0 (0, 0)
extrude "Extrusion19" cut sketch "Sketch16" against normal blind 177.8
sketch "Sketch17" plane through (0, 35.56, 0) normal (0, -1, 0) x (1, 0, 0)
  line L0 (-31.8571, -65.2503) -> (-31.8571, -102.7444) projected
  line L1 (-31.8571, -66.1393) -> (-49.6316, -66.1393)
  line L2 (-49.6316, -66.1393) -> (-49.6316, -101.3551)
  line L3 (-49.6316, -101.3551) -> (-31.8571, -101.3551)
  line L4 (-31.8571, -101.3551) -> (-31.8571, -66.1393)
  line L5 (-27.0211, -45.002) -> (-58.7264, -45.002)
  line L6 (-58.7264, -45.002) -> (-58.7264, -117.0923)
  line L7 (-58.7264, -117.0923) -> (-27.0211, -117.0923)
  line L8 (-27.0211, -117.0923) -> (-27.0211, -45.002)
  point P0 (0, 0)
extrude "Extrusion20" cut sketch "Sketch17" against normal blind 177.8
properties part number "LED_slots"
